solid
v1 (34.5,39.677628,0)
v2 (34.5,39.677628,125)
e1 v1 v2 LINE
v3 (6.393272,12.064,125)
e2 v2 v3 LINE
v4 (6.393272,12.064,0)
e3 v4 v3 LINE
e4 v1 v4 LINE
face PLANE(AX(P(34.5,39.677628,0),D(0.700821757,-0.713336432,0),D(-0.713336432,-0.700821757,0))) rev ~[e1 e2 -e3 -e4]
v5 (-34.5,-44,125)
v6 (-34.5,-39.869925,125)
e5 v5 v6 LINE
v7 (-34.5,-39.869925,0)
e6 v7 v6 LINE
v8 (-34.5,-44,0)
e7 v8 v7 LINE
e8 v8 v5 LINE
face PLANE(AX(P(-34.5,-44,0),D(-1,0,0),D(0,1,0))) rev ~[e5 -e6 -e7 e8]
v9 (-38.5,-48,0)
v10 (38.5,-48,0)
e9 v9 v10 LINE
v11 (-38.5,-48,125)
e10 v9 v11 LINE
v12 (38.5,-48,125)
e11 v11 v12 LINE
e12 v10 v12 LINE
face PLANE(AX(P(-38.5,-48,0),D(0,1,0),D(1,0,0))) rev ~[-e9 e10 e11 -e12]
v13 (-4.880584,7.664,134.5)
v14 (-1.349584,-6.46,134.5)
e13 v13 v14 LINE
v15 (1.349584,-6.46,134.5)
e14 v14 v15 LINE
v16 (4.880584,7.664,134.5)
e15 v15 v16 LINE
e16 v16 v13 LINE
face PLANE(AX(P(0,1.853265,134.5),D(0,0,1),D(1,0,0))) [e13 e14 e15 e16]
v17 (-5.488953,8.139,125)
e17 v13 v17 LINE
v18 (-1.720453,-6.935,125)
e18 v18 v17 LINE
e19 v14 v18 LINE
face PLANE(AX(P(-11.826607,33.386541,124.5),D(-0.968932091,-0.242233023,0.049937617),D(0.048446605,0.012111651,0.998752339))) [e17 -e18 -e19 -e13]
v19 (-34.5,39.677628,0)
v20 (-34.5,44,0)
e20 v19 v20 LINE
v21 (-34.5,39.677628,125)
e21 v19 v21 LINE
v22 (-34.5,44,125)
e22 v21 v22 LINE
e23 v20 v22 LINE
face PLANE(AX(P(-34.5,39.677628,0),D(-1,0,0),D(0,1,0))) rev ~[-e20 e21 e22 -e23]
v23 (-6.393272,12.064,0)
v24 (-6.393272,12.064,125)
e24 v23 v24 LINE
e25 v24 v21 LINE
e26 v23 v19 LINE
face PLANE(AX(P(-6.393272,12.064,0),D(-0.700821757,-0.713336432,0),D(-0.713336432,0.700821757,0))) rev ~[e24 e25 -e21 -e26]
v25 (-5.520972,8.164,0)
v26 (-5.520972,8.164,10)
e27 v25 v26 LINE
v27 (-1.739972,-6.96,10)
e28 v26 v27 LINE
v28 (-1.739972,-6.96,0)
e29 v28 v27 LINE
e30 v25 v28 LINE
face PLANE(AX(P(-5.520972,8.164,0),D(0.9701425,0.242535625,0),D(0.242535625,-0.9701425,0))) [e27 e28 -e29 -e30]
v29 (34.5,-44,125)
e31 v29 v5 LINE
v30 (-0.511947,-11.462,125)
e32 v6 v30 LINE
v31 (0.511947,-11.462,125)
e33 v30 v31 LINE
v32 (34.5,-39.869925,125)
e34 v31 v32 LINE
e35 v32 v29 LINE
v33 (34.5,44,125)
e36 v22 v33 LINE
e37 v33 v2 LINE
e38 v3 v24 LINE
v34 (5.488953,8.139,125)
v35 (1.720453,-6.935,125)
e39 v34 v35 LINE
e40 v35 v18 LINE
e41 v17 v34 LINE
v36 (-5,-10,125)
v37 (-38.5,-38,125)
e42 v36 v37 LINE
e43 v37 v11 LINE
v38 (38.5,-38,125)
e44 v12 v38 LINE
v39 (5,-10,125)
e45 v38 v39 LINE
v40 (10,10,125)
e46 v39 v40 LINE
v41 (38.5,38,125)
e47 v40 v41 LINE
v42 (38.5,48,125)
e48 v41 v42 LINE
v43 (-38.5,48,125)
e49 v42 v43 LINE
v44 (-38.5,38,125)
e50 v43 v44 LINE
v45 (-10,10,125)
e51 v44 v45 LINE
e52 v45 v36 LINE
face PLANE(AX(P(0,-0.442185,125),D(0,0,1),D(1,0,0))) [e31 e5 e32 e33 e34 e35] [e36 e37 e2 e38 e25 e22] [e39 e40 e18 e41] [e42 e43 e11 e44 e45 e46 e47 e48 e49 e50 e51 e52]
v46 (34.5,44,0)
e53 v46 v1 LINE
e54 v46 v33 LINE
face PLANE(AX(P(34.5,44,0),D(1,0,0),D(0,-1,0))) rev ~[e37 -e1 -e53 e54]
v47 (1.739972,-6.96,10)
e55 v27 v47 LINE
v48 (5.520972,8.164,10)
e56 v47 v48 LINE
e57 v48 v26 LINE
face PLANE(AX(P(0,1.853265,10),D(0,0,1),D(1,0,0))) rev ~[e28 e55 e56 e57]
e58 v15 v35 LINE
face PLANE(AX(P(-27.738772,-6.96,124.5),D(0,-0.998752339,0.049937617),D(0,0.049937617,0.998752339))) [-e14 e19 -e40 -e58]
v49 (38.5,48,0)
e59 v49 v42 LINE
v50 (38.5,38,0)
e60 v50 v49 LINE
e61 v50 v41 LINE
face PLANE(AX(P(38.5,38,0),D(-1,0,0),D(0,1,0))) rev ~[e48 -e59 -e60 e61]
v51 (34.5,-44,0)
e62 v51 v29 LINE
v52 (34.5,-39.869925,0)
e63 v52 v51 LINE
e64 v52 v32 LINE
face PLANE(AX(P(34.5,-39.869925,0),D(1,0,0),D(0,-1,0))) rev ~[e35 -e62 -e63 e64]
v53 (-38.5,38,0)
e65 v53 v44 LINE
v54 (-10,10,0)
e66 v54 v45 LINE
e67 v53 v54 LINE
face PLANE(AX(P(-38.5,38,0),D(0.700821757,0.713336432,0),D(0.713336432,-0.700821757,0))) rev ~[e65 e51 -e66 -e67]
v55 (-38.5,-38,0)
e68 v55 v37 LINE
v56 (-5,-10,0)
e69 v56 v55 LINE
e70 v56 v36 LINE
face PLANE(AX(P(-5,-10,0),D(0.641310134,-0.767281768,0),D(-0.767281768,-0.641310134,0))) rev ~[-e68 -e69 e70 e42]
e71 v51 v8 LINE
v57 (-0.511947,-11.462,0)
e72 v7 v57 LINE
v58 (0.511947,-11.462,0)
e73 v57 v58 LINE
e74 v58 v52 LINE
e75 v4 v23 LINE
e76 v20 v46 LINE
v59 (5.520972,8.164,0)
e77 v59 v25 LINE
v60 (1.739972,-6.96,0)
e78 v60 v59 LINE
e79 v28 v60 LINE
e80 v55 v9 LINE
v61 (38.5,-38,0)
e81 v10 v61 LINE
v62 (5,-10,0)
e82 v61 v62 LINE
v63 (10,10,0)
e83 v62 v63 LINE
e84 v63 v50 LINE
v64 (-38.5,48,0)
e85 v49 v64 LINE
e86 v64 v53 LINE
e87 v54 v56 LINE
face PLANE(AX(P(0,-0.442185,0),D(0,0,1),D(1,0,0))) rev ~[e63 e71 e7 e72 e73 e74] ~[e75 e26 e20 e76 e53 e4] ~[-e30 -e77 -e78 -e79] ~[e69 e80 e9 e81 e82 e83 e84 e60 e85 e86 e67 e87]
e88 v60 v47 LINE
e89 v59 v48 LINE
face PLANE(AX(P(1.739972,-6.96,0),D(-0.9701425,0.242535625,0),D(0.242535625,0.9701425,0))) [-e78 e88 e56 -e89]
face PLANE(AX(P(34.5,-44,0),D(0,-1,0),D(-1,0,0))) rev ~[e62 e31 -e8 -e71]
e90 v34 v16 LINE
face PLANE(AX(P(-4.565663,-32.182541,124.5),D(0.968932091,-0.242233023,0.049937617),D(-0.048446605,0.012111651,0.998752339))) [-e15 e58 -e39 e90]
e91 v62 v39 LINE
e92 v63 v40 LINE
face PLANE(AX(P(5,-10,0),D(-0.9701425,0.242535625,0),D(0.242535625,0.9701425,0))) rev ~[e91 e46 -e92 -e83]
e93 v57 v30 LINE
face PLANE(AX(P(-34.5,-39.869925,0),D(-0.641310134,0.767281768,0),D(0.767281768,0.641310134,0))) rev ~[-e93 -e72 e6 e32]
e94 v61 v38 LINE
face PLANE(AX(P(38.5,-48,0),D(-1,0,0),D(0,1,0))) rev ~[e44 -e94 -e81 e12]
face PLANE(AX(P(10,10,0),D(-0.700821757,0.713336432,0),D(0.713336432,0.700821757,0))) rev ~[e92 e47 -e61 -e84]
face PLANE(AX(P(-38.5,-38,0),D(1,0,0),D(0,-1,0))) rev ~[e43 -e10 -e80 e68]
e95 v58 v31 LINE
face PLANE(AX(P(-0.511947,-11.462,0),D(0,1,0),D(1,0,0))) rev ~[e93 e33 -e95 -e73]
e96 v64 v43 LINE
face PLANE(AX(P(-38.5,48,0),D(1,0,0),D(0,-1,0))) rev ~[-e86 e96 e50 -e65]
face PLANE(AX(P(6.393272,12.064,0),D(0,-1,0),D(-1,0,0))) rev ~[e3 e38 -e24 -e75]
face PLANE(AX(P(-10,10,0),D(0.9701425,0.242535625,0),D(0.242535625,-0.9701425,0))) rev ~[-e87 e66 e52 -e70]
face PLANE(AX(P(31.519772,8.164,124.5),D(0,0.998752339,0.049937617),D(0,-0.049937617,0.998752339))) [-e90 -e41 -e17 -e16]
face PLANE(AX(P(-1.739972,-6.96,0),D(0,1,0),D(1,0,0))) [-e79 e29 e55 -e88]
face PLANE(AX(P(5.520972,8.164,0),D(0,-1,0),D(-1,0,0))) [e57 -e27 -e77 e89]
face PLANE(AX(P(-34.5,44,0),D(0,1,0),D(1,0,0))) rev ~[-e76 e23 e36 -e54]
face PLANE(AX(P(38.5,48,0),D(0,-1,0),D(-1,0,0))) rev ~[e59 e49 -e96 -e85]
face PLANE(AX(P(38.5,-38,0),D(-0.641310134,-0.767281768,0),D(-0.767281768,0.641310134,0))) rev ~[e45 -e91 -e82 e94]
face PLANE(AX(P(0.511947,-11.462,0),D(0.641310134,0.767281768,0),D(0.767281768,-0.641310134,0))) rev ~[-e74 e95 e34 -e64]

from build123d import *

# Parameters (mm, degrees)
F1_DEPTH     = 125
F2_DEPTH     = 10
F4_DEPTH     = 9.5
F5_T4_DEPTH  = 67.5870629671
F5_T9_DEPTH  = 55.4775446264
F5_T14_DEPTH = 67.5870629671
F5_T19_DEPTH = 63.0395446265


# Not quite as in the source:
# - a fillet or chamfer that OpenCascade refuses, or shapes differently, is made with other operations: its cross-section is extruded or revolved along the edge and cut away or added
# - a feature names something its author has since deleted; it is built from what else it names


with BuildPart() as f1:
    # F0 (on Top) → F1 (new body)
    with BuildSketch(Plane.XY):
        Polygon((-38.5, -38), (-38.5, -48), (38.5, -48), (38.5, -38), (5, -10), (10, 10), (38.5000000008, 38), (38.5, 48), (-38.5, 48), (-38.5000000011, 38), (-10, 10), (-5, -10), align=None)
        Polygon((-0.5119467155, -11.462), (0.5119467155, -11.462), (34.5, -39.8699251333), (34.5, -44), (-34.5, -44), (-34.5, -39.8699251333), align=None, mode=Mode.SUBTRACT)
        Polygon((-5.5209720151, 8.1640000003), (5.5209720151, 8.1640000003), (1.739972015, -6.96), (-1.739972015, -6.96), align=None, mode=Mode.SUBTRACT)
        Polygon((34.5000000007, 39.6776277195), (6.3932717857, 12.0640000003), (-6.3932717857, 12.0640000003), (-34.5000000007, 39.6776277195), (-34.5000000005, 44), (34.5000000003, 44), align=None, mode=Mode.SUBTRACT)
        Polygon((1.739972015, -6.96), (5.5209720151, 8.1640000003), (-5.5209720151, 8.1640000003), (-1.739972015, -6.96), align=None)
    extrude(amount=F1_DEPTH)

    # F0 (on Top) → F2 (cut)
    with BuildSketch(Plane.XY):
        Polygon((1.739972015, -6.96), (5.5209720151, 8.1640000003), (-5.5209720151, 8.1640000003), (-1.739972015, -6.96), align=None)
    extrude(amount=F2_DEPTH, mode=Mode.SUBTRACT)

    # F3 (on face) → F4 (join)
    with BuildSketch(Plane.XY.offset(125)):
        Polygon((1.739972015, -6.96), (5.5209720151, 8.1640000003), (-5.5209720151, 8.1640000003), (-1.739972015, -6.96), align=None)
    extrude(amount=F4_DEPTH)

    # F5: chamfer of 10 x 0.5 on 4 edges, made by hand


with BuildPart() as f5_tool2:
    # F5_s3 → F5_t4 (new body)
    with BuildSketch(Plane(origin=(-7.8409310443, -31.3637241773, 0), x_dir=(0, 0, 1), z_dir=(0.242535625, 0.9701425001, 0))):
        Polygon((124.5, 3.3760687511), (134.5, 2.8760687511), (134.5, 3.3760687511), align=None)
    extrude(amount=F5_T4_DEPTH)

    split(bisect_by=Plane.XY.offset(125), keep=Keep.TOP)


with BuildPart() as f1_1:
    add(f1.part)

    # F5_t1: cut F5_tool2
    add(f5_tool2.part, mode=Mode.SUBTRACT)


with BuildPart() as f5_tool7:
    # F5_s8 → F5_t9 (new body)
    with BuildSketch(Plane.YZ.offset(-27.7387723132)):
        Polygon((-6.96, 124.5), (-6.46, 134.5), (-6.96, 134.5), align=None)
    extrude(amount=F5_T9_DEPTH)

    split(bisect_by=Plane.XY.offset(125), keep=Keep.TOP)


with BuildPart() as f1_2:
    add(f1_1.part)

    # F5_t6: cut F5_tool7
    add(f5_tool7.part, mode=Mode.SUBTRACT)


with BuildPart() as f5_tool12:
    # F5_s13 → F5_t14 (new body)
    with BuildSketch(Plane(origin=(-8.5513395168, 34.2053580671, 0), x_dir=(0, 0, 1), z_dir=(0.242535625, -0.9701425001, 0))):
        Polygon((124.5, 3.3760687511), (134.5, 2.8760687511), (134.5, 3.3760687511), align=None)
    extrude(amount=F5_T14_DEPTH)

    split(bisect_by=Plane.XY.offset(125), keep=Keep.TOP)


with BuildPart() as f1_3:
    add(f1_2.part)

    # F5_t11: cut F5_tool12
    add(f5_tool12.part, mode=Mode.SUBTRACT)


with BuildPart() as f5_tool17:
    # F5_s18 → F5_t19 (new body)
    with BuildSketch(Plane.YZ.offset(31.5197723133)):
        Polygon((8.1640000003, 124.5), (7.6640000003, 134.5), (8.1640000003, 134.5), align=None)
    extrude(amount=-F5_T19_DEPTH)

    split(bisect_by=Plane.XY.offset(125), keep=Keep.TOP)


with BuildPart() as f1_4:
    add(f1_3.part)

    # F5_t16: cut F5_tool17
    add(f5_tool17.part, mode=Mode.SUBTRACT)


solid = f1_4.part
